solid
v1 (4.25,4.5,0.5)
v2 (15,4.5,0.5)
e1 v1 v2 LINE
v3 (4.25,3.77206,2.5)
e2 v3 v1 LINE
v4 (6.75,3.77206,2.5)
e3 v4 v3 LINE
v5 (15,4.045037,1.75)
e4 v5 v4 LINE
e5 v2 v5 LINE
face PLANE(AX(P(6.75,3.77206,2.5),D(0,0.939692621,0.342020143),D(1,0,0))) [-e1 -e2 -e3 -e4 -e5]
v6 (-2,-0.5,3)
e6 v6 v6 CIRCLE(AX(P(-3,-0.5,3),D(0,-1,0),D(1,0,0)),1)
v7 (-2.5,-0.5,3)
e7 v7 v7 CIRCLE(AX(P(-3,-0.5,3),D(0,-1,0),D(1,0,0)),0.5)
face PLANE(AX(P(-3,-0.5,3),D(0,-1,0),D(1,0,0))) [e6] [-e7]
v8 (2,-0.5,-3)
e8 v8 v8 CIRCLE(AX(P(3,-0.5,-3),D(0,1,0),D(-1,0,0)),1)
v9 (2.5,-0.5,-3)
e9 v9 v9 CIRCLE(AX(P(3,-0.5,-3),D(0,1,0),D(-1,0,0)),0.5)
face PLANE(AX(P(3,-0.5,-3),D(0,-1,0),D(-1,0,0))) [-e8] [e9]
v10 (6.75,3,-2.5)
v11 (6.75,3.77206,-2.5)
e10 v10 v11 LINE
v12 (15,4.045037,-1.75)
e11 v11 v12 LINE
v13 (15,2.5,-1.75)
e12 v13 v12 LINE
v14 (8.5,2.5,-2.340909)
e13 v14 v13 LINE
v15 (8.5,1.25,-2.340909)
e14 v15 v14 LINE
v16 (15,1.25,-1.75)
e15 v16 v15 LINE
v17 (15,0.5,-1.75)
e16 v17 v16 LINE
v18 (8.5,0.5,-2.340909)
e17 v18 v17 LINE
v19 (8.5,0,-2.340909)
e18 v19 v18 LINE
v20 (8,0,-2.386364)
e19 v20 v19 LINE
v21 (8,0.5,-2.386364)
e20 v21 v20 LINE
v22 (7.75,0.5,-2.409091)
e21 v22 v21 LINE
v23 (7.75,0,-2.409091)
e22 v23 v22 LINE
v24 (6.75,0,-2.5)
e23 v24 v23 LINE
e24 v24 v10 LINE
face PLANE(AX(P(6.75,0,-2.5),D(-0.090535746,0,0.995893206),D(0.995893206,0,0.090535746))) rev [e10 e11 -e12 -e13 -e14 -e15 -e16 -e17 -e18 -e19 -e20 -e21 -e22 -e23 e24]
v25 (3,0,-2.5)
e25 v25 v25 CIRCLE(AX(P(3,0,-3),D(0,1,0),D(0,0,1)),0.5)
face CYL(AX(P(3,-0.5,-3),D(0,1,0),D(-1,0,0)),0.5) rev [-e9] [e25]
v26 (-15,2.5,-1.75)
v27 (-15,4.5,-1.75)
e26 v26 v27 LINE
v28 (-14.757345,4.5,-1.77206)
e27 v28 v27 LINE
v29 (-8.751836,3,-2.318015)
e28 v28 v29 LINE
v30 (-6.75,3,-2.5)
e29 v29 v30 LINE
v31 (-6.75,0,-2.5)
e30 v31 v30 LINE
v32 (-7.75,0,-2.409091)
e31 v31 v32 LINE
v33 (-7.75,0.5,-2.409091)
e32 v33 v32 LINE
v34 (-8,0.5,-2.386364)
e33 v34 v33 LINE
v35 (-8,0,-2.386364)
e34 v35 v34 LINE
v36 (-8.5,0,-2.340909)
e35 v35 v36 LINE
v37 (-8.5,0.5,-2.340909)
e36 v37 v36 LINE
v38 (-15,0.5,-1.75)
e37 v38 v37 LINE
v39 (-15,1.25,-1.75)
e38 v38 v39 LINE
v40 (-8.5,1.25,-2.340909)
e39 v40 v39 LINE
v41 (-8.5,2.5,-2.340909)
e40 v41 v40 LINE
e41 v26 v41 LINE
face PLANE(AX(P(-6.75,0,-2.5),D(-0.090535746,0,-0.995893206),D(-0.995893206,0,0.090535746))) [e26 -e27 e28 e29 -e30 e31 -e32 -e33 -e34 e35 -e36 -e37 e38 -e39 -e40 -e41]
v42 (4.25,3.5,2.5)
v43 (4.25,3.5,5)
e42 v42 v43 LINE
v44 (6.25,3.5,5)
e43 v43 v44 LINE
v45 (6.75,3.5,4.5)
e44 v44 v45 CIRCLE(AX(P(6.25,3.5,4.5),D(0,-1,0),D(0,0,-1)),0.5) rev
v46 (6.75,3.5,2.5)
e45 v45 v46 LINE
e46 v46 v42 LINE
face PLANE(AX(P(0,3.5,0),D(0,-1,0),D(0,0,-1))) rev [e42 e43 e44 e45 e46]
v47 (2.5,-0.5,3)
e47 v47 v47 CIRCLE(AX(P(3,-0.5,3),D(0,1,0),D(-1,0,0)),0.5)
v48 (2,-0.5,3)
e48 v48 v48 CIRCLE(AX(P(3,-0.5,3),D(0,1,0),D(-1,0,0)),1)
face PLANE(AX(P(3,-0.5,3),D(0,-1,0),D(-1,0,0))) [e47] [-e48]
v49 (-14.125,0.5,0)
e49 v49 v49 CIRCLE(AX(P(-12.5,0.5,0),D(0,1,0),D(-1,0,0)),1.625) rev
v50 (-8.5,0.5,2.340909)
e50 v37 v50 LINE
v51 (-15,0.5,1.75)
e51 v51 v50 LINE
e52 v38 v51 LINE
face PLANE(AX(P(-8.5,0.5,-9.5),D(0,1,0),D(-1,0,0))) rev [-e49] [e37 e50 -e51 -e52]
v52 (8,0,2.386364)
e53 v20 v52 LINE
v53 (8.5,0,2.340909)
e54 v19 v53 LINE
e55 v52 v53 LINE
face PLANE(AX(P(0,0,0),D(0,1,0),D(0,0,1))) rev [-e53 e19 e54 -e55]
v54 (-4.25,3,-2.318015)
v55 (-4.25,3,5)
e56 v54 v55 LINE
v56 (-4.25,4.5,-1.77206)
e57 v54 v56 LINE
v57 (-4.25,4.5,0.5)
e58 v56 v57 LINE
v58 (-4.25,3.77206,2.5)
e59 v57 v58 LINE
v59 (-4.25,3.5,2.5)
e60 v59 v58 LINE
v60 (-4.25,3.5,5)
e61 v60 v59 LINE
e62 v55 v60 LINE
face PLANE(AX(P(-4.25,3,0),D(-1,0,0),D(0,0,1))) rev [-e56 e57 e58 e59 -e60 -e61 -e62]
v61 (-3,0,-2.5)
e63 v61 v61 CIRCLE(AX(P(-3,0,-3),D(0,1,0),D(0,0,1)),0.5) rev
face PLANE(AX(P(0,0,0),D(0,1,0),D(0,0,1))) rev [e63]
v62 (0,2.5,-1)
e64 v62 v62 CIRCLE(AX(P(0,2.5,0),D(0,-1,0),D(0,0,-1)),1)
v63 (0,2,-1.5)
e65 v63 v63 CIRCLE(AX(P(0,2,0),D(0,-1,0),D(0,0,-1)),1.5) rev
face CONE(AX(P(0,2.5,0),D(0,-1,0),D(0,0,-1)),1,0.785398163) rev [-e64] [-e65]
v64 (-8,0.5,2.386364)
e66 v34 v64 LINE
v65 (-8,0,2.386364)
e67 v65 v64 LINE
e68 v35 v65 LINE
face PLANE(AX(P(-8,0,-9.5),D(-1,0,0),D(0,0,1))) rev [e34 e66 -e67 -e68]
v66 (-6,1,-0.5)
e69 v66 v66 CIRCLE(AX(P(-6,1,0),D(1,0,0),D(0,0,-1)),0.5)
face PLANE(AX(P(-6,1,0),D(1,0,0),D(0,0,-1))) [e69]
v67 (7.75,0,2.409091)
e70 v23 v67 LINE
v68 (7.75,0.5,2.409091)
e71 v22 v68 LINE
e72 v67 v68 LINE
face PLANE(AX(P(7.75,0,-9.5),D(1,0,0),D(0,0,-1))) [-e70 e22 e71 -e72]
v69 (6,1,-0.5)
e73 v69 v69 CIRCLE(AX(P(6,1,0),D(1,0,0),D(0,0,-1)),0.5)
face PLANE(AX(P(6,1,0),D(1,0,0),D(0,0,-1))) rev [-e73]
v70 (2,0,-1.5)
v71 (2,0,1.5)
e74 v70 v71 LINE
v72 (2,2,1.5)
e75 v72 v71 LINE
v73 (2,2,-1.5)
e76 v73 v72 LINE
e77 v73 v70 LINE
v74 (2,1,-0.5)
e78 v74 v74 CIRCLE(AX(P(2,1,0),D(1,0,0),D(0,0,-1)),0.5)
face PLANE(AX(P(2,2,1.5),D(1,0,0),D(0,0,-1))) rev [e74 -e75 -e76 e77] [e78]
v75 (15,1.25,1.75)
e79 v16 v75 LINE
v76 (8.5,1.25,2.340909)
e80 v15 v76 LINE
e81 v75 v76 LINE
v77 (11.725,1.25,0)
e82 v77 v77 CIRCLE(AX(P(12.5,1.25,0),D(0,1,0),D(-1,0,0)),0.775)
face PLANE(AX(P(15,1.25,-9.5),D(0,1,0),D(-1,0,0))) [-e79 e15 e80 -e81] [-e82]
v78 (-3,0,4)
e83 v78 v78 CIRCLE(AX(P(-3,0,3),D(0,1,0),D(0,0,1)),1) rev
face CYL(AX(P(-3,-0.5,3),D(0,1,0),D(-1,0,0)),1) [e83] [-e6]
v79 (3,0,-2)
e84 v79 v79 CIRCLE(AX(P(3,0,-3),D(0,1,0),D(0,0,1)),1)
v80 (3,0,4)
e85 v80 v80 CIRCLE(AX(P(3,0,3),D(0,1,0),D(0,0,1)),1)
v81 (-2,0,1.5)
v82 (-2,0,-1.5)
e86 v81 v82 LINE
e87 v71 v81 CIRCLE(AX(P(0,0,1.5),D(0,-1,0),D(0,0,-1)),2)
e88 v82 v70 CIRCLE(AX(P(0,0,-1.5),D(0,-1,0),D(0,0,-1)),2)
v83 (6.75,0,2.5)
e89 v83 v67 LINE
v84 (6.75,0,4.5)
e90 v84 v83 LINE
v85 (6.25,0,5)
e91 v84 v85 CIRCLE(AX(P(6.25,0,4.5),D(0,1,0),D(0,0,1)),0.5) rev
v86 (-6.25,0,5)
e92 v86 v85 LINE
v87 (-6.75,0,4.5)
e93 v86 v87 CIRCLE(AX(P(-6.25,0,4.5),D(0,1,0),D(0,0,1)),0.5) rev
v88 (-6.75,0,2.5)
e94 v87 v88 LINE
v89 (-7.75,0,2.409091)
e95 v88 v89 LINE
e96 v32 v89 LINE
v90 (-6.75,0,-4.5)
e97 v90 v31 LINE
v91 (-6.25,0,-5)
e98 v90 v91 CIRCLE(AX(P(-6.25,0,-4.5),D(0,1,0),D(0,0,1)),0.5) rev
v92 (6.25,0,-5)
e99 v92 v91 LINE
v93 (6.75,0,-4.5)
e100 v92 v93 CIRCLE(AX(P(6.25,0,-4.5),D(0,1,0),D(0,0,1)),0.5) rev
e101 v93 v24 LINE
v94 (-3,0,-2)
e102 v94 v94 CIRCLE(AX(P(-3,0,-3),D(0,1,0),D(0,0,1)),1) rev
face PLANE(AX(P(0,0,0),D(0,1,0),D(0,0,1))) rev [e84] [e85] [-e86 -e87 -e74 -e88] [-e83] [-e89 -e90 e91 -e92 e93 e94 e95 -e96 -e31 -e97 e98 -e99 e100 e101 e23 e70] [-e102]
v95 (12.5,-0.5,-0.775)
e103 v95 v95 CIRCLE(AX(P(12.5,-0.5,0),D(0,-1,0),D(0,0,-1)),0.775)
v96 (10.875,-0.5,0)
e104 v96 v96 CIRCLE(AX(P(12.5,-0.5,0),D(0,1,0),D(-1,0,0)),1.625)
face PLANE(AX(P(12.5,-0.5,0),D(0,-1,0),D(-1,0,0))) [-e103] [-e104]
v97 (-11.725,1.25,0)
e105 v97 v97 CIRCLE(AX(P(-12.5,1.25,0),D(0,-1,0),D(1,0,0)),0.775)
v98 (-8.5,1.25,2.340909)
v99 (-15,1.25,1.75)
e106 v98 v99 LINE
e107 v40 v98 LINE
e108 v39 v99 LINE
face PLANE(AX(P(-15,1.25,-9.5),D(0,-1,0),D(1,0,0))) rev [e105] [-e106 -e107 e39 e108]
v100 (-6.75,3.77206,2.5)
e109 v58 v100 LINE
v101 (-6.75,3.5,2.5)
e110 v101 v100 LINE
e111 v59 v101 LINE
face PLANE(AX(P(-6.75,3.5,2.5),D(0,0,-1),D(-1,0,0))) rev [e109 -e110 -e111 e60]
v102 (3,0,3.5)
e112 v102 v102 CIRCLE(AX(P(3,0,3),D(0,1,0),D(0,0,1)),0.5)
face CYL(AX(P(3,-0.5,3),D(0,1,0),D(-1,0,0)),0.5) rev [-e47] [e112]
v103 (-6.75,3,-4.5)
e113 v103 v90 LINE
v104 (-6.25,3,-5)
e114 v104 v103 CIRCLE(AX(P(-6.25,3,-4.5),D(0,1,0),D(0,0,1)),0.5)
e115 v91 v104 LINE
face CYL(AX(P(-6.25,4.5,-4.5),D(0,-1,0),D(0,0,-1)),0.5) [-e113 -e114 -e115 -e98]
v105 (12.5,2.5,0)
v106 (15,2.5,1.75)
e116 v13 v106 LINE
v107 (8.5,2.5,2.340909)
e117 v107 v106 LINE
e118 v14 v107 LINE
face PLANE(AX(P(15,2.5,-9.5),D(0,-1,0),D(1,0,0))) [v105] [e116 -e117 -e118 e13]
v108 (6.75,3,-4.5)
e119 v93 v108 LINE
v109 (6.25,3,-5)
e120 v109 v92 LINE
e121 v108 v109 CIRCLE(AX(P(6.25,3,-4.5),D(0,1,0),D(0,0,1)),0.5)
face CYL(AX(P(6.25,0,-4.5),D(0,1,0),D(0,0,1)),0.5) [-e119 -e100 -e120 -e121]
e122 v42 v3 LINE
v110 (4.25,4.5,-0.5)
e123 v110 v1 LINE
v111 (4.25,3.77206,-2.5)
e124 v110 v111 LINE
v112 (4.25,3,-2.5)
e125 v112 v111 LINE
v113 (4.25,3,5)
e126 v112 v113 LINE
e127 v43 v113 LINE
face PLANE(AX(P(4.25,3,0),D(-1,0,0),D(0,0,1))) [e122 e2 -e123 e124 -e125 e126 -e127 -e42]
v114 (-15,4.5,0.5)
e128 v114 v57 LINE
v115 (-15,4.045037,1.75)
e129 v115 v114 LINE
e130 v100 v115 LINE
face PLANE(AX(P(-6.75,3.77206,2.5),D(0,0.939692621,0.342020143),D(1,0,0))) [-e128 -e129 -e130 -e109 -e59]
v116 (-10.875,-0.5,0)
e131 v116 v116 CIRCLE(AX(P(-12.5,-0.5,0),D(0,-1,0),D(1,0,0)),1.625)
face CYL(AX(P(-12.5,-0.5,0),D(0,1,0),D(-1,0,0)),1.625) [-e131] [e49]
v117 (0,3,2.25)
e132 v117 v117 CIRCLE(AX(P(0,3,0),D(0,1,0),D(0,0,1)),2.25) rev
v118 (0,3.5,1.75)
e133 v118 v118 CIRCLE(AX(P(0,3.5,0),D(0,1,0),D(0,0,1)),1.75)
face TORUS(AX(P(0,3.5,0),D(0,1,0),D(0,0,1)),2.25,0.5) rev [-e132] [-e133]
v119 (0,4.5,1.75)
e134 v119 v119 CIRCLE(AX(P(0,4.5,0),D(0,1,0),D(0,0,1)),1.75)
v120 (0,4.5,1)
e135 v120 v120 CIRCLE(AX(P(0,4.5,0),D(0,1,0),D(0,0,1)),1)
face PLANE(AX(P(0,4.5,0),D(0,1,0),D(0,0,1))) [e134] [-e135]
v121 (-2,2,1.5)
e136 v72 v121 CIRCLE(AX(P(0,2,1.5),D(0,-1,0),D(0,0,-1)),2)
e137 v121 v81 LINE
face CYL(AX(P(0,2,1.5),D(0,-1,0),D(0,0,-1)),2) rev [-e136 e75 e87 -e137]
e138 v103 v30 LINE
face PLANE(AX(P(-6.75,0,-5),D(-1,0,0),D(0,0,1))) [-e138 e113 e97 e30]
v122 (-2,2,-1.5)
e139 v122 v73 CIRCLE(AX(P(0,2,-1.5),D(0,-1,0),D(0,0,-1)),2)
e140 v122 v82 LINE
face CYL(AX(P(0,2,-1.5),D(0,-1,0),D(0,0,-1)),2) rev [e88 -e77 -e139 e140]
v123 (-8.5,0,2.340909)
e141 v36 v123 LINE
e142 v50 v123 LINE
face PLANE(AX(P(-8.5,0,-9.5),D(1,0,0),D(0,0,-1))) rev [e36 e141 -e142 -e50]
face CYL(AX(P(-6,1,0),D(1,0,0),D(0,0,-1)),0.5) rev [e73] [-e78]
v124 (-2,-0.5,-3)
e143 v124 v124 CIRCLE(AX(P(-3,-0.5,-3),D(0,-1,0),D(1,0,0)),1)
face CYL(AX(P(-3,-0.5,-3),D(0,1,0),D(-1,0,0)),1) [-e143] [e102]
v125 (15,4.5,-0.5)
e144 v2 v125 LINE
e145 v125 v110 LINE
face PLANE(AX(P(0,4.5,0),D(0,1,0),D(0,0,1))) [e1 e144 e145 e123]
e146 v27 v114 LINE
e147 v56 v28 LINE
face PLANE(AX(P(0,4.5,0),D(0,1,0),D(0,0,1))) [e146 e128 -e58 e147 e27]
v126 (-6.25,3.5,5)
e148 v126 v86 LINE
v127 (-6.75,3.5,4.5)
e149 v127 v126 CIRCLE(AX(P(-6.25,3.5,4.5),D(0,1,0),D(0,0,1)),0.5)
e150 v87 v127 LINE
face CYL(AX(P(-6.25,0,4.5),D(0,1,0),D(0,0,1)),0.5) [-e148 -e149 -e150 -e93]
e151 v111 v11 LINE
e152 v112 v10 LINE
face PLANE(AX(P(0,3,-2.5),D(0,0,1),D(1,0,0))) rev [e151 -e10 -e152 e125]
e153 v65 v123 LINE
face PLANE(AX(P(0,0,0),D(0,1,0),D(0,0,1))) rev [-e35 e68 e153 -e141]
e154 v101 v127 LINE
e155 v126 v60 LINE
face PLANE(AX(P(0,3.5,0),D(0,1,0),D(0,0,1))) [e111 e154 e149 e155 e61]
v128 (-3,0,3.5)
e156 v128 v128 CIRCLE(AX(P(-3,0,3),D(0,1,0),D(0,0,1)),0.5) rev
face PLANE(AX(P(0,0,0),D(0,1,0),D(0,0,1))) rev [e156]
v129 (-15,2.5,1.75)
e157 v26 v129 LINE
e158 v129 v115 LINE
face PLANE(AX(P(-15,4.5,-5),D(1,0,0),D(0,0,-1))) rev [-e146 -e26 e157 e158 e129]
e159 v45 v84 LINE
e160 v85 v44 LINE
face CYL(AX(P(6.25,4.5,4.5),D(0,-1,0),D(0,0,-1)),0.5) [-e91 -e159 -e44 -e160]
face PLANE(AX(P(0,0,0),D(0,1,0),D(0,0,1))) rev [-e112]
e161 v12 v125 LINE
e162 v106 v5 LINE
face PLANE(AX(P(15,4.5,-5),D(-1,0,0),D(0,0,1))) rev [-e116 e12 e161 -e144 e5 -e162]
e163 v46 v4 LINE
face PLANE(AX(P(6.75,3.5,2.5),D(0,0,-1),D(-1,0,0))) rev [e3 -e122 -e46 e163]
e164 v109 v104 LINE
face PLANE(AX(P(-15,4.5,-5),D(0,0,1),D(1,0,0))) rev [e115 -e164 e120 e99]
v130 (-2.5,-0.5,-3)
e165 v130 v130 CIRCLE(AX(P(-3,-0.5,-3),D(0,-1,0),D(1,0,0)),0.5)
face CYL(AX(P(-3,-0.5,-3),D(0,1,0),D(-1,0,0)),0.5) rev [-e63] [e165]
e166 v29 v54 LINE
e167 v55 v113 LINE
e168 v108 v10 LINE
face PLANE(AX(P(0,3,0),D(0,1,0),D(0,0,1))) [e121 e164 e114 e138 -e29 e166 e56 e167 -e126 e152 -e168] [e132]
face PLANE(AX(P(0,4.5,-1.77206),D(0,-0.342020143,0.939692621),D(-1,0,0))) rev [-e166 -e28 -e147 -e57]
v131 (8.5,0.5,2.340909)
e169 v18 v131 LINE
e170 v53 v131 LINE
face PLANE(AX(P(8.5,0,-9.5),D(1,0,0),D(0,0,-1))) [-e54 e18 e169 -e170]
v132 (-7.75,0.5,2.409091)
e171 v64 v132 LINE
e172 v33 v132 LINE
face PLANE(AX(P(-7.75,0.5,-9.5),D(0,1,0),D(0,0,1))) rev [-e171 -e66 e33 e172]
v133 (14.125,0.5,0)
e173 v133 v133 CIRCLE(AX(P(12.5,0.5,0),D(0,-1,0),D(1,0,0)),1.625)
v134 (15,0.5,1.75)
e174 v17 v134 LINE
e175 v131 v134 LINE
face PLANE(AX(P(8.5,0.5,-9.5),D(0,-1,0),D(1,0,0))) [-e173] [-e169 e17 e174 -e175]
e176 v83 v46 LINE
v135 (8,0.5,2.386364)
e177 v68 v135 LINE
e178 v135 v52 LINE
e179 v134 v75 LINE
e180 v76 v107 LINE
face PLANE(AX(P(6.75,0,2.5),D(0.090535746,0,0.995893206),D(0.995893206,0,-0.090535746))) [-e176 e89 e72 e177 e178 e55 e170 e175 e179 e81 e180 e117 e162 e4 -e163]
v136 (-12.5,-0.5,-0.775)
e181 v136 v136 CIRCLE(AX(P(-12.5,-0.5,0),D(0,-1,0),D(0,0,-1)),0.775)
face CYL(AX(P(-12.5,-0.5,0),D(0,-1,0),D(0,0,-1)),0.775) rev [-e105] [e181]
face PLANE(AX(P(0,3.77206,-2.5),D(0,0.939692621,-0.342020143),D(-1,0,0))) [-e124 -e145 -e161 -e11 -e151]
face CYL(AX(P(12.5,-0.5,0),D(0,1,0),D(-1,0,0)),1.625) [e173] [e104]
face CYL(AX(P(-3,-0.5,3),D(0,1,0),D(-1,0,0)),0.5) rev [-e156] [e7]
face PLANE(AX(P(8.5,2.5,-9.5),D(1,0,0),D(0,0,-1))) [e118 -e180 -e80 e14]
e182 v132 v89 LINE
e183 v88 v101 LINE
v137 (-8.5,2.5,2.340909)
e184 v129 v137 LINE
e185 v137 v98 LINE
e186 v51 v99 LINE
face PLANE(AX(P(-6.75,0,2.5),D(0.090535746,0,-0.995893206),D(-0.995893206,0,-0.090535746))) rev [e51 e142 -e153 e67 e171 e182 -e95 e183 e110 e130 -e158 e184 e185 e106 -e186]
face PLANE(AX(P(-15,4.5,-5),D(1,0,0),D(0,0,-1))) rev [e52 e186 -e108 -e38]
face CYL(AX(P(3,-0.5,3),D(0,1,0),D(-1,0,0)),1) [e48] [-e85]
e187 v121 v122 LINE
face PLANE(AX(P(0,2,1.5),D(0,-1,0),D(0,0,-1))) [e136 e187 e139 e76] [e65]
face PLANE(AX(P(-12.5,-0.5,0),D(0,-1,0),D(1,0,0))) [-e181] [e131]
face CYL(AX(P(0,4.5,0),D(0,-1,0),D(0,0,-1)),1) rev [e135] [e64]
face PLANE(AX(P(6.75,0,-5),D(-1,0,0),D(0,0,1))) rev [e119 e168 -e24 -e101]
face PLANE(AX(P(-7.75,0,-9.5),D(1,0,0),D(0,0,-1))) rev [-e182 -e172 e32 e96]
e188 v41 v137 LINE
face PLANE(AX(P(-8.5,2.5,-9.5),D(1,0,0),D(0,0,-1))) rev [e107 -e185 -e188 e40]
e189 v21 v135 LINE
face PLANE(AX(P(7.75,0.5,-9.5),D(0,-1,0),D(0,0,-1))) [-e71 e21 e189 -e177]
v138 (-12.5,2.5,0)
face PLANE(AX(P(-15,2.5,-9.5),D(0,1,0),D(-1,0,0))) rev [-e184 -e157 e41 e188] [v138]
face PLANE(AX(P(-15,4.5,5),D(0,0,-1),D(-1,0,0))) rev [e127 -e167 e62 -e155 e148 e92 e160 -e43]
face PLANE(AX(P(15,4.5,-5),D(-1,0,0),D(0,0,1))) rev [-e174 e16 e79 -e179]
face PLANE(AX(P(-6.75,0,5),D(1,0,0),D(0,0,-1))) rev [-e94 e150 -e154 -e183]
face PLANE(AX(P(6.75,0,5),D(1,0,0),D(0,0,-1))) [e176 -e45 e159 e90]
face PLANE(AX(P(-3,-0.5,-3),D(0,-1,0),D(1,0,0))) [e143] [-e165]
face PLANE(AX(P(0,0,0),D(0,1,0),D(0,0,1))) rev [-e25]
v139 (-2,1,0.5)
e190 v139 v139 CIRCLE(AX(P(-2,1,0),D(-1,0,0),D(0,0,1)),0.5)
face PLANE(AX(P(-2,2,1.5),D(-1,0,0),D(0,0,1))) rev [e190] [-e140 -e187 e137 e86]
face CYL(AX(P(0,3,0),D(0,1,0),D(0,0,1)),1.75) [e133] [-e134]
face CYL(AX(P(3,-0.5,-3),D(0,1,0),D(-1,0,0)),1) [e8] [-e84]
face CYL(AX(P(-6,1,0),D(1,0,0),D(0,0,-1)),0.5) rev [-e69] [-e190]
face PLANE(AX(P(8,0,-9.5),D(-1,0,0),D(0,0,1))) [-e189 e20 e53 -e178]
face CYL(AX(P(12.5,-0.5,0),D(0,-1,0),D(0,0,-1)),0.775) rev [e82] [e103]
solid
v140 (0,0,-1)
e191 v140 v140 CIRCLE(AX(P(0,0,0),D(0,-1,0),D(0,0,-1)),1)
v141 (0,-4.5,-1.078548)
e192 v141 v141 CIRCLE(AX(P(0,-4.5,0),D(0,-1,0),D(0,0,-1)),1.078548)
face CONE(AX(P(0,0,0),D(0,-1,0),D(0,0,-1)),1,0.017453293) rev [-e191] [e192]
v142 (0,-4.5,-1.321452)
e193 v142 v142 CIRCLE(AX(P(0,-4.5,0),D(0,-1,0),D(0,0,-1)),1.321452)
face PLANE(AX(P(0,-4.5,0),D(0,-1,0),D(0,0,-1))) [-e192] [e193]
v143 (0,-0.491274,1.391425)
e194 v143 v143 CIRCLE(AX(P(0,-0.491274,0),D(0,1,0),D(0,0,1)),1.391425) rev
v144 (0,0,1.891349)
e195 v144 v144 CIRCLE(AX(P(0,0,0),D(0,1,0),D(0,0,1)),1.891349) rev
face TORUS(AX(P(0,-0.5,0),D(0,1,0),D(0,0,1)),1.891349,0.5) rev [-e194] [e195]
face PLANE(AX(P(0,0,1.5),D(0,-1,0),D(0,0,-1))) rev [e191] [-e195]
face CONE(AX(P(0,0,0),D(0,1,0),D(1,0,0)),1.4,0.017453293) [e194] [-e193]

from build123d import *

# Parameters (mm, degrees)
SKETCH2_W           = 30
SKETCH2_H           = 10
SKETCH2_R           = 1
BOSS_EXTRUDE1_DEPTH = 4.5
CUT_EXTRUDE1_START  = -1.5
SKETCH3_W           = 2.5
SKETCH3_H           = 2.5
SKETCH3_R           = 1.75
SKETCH3_R_2         = 1
CUT_EXTRUDE1_DEPTH  = 1.5
CUT_EXTRUDE2_DEPTH  = 17.439282223
SKETCH6_W           = 0.25
SKETCH6_H           = 0.5
SKETCH6_W_2         = 6.5
SKETCH6_H_2         = 1.25
CUT_EXTRUDE4_DEPTH  = 9.5
SKETCH7_R           = 1.625
SKETCH7_R_2         = 1
SKETCH7_R_3         = 0.5
BOSS_EXTRUDE2_DEPTH = 1
SKETCH38_W          = 2.5
SKETCH38_H          = 2.5
BOSS_EXTRUDE3_DEPTH = 1.5
SKETCH39_W          = 2.5
SKETCH39_H          = 2.5
CUT_EXTRUDE7_DEPTH  = 1
CHAMFER3_SIZE       = 2
CHAMFER3_SIZE_2     = 0.727940469
SKETCH41_R          = 1.4
SKETCH41_R_2        = 1
EXTRUDE_THIN1_DEPTH = 4.5
EXTRUDE_THIN1_DRAFT = 1
FILLET3_R           = 0.5
CUT_EXTRUDE5_DEPTH  = 2
SKETCH37_R          = 0.5
CUT_EXTRUDE6_DEPTH  = 6
FILLET1_R           = 0.5
CHAMFER2_SIZE       = 0.5


with BuildPart() as part:
    # Sketch2 → Boss-Extrude1 (new body)
    with BuildSketch(Plane(origin=(0, 0, 0), x_dir=(1, 0, 0), z_dir=(0, 1, 0))):
        Rectangle(SKETCH2_W, SKETCH2_H)
        with Locations(Location((0, 0, 0), (0, 0, 270))):
            Circle(SKETCH2_R, mode=Mode.SUBTRACT)
    extrude(amount=BOSS_EXTRUDE1_DEPTH)

    # Sketch3 → Cut-Extrude1 (cut)
    # profile 1 of 5: a face of its own
    with BuildSketch(Plane(origin=(0, 4.5, 0), x_dir=(1, 0, 0), z_dir=(0, 1, 0)).offset(CUT_EXTRUDE1_START)):
        with Locations((-5.5, 3.75)):
            Rectangle(SKETCH3_W, SKETCH3_H)
    # profile 2 of 5: a face of its own
    with BuildSketch(Plane(origin=(0, 4.5, 0), x_dir=(1, 0, 0), z_dir=(0, 1, 0)).offset(CUT_EXTRUDE1_START)):
        with Locations((5.5, 3.75)):
            Rectangle(SKETCH3_W, SKETCH3_H)
    # profile 3 of 5: a face of its own
    with BuildSketch(Plane(origin=(0, 4.5, 0), x_dir=(1, 0, 0), z_dir=(0, 1, 0)).offset(CUT_EXTRUDE1_START)):
        Polygon((4.25, 5), (-4.25, 5), (-4.25, 2.5), (-4.25, -5), (4.25, -5), (4.25, -2.5), (4.25, 2.5), align=None)
        with Locations(Location((0, 0, 0), (0, 0, 270))):
            Circle(SKETCH3_R, mode=Mode.SUBTRACT)
    # profile 4 of 5: a face of its own
    with BuildSketch(Plane(origin=(0, 4.5, 0), x_dir=(1, 0, 0), z_dir=(0, 1, 0)).offset(CUT_EXTRUDE1_START)):
        with Locations(Location((0, 0, 0), (0, 0, 270))):
            Circle(SKETCH3_R_2)
    # profile 5 of 5: a face of its own
    with BuildSketch(Plane(origin=(0, 4.5, 0), x_dir=(1, 0, 0), z_dir=(0, 1, 0)).offset(CUT_EXTRUDE1_START)):
        with Locations((5.5, -3.75)):
            Rectangle(SKETCH3_W, SKETCH3_H)
    extrude(amount=CUT_EXTRUDE1_DEPTH, mode=Mode.SUBTRACT)

    # Sketch4 → Cut-Extrude2 (cut, through all)
    with BuildSketch(Plane(origin=(0, 4.5, 0), x_dir=(1, 0, 0), z_dir=(0, 1, 0))):
        Polygon((-6.75, 5), (-6.75, 2.5), (-15, 1.75), (-15, 5), align=None)
        Polygon((6.75, -5), (6.75, -2.5), (15, -1.75), (15, -5), align=None)
        Polygon((15, 5), (6.75, 5), (6.75, 2.5), (15, 1.75), align=None)
        Polygon((-15, -1.75), (-15, -5), (-6.75, -5), (-6.75, -2.5), align=None)
    extrude(amount=-CUT_EXTRUDE2_DEPTH, mode=Mode.SUBTRACT)

    # Sketch6 → Cut-Extrude4 (cut, symmetric)
    with BuildSketch(Plane.XY):
        with Locations((-7.875, 0.25)):
            Rectangle(SKETCH6_W, SKETCH6_H)
        with Locations((-11.75, 0.25)):
            Rectangle(SKETCH6_W_2, SKETCH6_H)
        with Locations((-11.75, 1.875)):
            Rectangle(SKETCH6_W_2, SKETCH6_H_2)
    cut_extrude4 = extrude(amount=CUT_EXTRUDE4_DEPTH, both=True, mode=Mode.SUBTRACT)

    # Sketch7 → Boss-Extrude2 (add)
    # profile 1 of 3: a face of its own
    with BuildSketch(Plane.XZ.offset(-0.5)):
        with Locations(Location((-12.5, 0, 0), (0, 0, 180))):
            Circle(SKETCH7_R)
    # profile 2 of 3: a face of its own
    with BuildSketch(Plane.XZ.offset(-0.5)):
        with Locations(Location((-3, 3, 0), (0, 0, 90))):
            Circle(SKETCH7_R_2)
        with Locations(Location((-3, 3, 0), (0, 0, 90))):
            Circle(SKETCH7_R_3, mode=Mode.SUBTRACT)
    # profile 3 of 3: a face of its own
    with BuildSketch(Plane.XZ.offset(-0.5)):
        with Locations(Location((-3, -3, 0), (0, 0, 90))):
            Circle(SKETCH7_R_2)
        with Locations(Location((-3, -3, 0), (0, 0, 90))):
            Circle(SKETCH7_R_3, mode=Mode.SUBTRACT)
    boss_extrude2 = extrude(amount=BOSS_EXTRUDE2_DEPTH)

    # Sketch9 → Ø1.55 (1.55) Diameter Hole2 (revolve, cut)
    with BuildSketch(Plane(origin=(-12.5, -0.5, 0), x_dir=(0, 0, -1), z_dir=(1, 0, 0))):
        Polygon((0, 0), (0, 3), (0.775, 2.53433302), (0.775, 0), align=None)
    f_1_55_1_55_diameter_hole2 = revolve(axis=Axis((-12.5, -6.85, 0), (0, 1, 0)), mode=Mode.SUBTRACT)

    # Sketch38 → Boss-Extrude3 (add)
    with BuildSketch(Plane(origin=(0, 3, 0), x_dir=(1, 0, 0), z_dir=(0, 1, 0))):
        with Locations((5.5, -3.75)):
            Rectangle(SKETCH38_W, SKETCH38_H)
    extrude(amount=BOSS_EXTRUDE3_DEPTH)

    # Sketch39 → Cut-Extrude7 (cut)
    with BuildSketch(Plane(origin=(0, 4.5, 0), x_dir=(1, 0, 0), z_dir=(0, 1, 0))):
        with Locations((5.5, -3.75)):
            Rectangle(SKETCH39_W, SKETCH39_H)
        with Locations((-5.5, -3.75)):
            Rectangle(SKETCH39_W, SKETCH39_H)
    extrude(amount=-CUT_EXTRUDE7_DEPTH, mode=Mode.SUBTRACT)

    # Chamfer3
    # the kernel refuses this chamfer: 2, 0.727940469 mm, written as the material it takes off along each edge
    with BuildSketch(Plane(origin=(32.691947326, 4.5, 2.5), x_dir=(0, 0, -1), z_dir=(-1, 0, 0))) as chamfer3_piece_1:
        Polygon((CHAMFER3_SIZE, 0), (0, CHAMFER3_SIZE_2), (0, 0), align=None)
    extrude(amount=28.441947326, mode=Mode.SUBTRACT)
    with BuildSketch(Plane(origin=(4.25, 4.5, -2.5), x_dir=(0, -1, 0), z_dir=(1, 0, 0))) as chamfer3_piece_2:
        Polygon((CHAMFER3_SIZE_2, 0), (0, -CHAMFER3_SIZE), (0, 0), align=None)
    extrude(amount=28.441947326, mode=Mode.SUBTRACT)
    with BuildSketch(Plane(origin=(-32.691947326, 4.5, 2.5), x_dir=(0, 0, -1), z_dir=(1, 0, 0))) as chamfer3_piece_3:
        Polygon((CHAMFER3_SIZE, 0), (0, -CHAMFER3_SIZE_2), (0, 0), align=None)
    extrude(amount=28.441947326, mode=Mode.SUBTRACT)
    with BuildSketch(Plane(origin=(-15.570262091, 4.5, -2.5), x_dir=(0, -1, 0), z_dir=(1, 0, 0))) as chamfer3_piece_4_section:
        Polygon((CHAMFER3_SIZE, 0), (0, -CHAMFER3_SIZE_2), (0, 0), align=None)
    chamfer3_piece_4 = extrude(amount=16.508651556, mode=Mode.PRIVATE)
    chamfer3_piece_4 = split(chamfer3_piece_4, bisect_by=Plane(origin=(-15.570262091, 3, -2.5), z_dir=(0, 1, 0)), keep=Keep.TOP, mode=Mode.PRIVATE)
    add(chamfer3_piece_4, mode=Mode.SUBTRACT)

    # Mirror1: Cut-Extrude4, Boss-Extrude2, Ø1.55 (1.55) Diameter Hole2 across plane
    add(cut_extrude4.mirror(Plane(origin=(0, 0, 0), x_dir=(0, 0, 1), z_dir=(1, 0, 0))), mode=Mode.SUBTRACT)
    add(boss_extrude2.mirror(Plane(origin=(0, 0, 0), x_dir=(0, 0, 1), z_dir=(1, 0, 0))))
    add(f_1_55_1_55_diameter_hole2.mirror(Plane(origin=(0, 0, 0), x_dir=(0, 0, 1), z_dir=(1, 0, 0))), mode=Mode.SUBTRACT)


with BuildPart() as extrude_thin1_tool:
    # Sketch41 → Extrude-Thin1 (with draft: the straight prism first)
    with BuildSketch(Plane.XZ):
        Circle(SKETCH41_R)
        Circle(SKETCH41_R_2, mode=Mode.SUBTRACT)
    extrude(amount=EXTRUDE_THIN1_DEPTH)
    # Extrude-Thin1: the draft: its side faces are tilted about the plane it starts from
    extrude_thin1_sides = [extrude_thin1_tool.faces().sort_by_distance(p)[0] for p in [
        (-1.4, -2.25, 0),
        (-1, -2.25, 0),
    ]]
    draft(extrude_thin1_sides, Plane.XZ, EXTRUDE_THIN1_DRAFT)


with BuildPart() as part_1:
    add(part.part)

    # Extrude-Thin1: add extrude_thin1_tool
    add(extrude_thin1_tool.part)

    # Fillet3
    fillet3_edges = [part_1.edges().sort_by_distance(p)[0] for p in [
        (-1.4, 0, 0),
        (-6.75, 1.75, 5),
        (6.75, 1.75, 5),
        (6.75, 1.5, -5),
        (-6.75, 1.5, -5),
    ]]
    fillet(fillet3_edges, radius=FILLET3_R)

    # Sketch36 → Cut-Extrude5 (cut)
    with BuildSketch(Plane.XZ):
        with BuildLine():
            Line((2, 1.5), (2, -1.5))
            ThreePointArc((2, -1.5), (0, -3.5), (-2, -1.5))
            Line((-2, -1.5), (-2, 1.5))
            ThreePointArc((-2, 1.5), (0, 3.5), (2, 1.5))
        make_face()
    extrude(amount=-CUT_EXTRUDE5_DEPTH, mode=Mode.SUBTRACT)


with BuildPart() as cut_extrude5_piece_1:
    # of the separate pieces the step leaves, piece 1, a body of its own (cut_extrude5_pieces)
    add(part_1.part.solids().sort_by_distance((-6.25, 0, -5))[0])

    # Sketch37 → Cut-Extrude6 (cut, symmetric)
    with BuildSketch(Plane(origin=(0, 0, 0), x_dir=(0, 0, -1), z_dir=(1, 0, 0))):
        with Locations((0, 1)):
            Circle(SKETCH37_R)
    extrude(amount=CUT_EXTRUDE6_DEPTH, both=True, mode=Mode.SUBTRACT)

    # Fillet1
    fillet1_edges = [cut_extrude5_piece_1.edges().sort_by_distance(p)[0] for p in [
        (0, 3, -1.75),
    ]]
    fillet(fillet1_edges, radius=FILLET1_R)

    # Chamfer2
    chamfer2_edges = [cut_extrude5_piece_1.edges().sort_by_distance(p)[0] for p in [
        (0, 2, -1),
    ]]
    chamfer(chamfer2_edges, length=CHAMFER2_SIZE)


with BuildPart() as cut_extrude5_piece_2:
    # of the separate pieces the step leaves, piece 2, a body of its own (cut_extrude5_pieces)
    add(part_1.part.solids().sort_by_distance((1.891348632, 0, 0))[0])


solid = Compound([cut_extrude5_piece_1.part, cut_extrude5_piece_2.part])
